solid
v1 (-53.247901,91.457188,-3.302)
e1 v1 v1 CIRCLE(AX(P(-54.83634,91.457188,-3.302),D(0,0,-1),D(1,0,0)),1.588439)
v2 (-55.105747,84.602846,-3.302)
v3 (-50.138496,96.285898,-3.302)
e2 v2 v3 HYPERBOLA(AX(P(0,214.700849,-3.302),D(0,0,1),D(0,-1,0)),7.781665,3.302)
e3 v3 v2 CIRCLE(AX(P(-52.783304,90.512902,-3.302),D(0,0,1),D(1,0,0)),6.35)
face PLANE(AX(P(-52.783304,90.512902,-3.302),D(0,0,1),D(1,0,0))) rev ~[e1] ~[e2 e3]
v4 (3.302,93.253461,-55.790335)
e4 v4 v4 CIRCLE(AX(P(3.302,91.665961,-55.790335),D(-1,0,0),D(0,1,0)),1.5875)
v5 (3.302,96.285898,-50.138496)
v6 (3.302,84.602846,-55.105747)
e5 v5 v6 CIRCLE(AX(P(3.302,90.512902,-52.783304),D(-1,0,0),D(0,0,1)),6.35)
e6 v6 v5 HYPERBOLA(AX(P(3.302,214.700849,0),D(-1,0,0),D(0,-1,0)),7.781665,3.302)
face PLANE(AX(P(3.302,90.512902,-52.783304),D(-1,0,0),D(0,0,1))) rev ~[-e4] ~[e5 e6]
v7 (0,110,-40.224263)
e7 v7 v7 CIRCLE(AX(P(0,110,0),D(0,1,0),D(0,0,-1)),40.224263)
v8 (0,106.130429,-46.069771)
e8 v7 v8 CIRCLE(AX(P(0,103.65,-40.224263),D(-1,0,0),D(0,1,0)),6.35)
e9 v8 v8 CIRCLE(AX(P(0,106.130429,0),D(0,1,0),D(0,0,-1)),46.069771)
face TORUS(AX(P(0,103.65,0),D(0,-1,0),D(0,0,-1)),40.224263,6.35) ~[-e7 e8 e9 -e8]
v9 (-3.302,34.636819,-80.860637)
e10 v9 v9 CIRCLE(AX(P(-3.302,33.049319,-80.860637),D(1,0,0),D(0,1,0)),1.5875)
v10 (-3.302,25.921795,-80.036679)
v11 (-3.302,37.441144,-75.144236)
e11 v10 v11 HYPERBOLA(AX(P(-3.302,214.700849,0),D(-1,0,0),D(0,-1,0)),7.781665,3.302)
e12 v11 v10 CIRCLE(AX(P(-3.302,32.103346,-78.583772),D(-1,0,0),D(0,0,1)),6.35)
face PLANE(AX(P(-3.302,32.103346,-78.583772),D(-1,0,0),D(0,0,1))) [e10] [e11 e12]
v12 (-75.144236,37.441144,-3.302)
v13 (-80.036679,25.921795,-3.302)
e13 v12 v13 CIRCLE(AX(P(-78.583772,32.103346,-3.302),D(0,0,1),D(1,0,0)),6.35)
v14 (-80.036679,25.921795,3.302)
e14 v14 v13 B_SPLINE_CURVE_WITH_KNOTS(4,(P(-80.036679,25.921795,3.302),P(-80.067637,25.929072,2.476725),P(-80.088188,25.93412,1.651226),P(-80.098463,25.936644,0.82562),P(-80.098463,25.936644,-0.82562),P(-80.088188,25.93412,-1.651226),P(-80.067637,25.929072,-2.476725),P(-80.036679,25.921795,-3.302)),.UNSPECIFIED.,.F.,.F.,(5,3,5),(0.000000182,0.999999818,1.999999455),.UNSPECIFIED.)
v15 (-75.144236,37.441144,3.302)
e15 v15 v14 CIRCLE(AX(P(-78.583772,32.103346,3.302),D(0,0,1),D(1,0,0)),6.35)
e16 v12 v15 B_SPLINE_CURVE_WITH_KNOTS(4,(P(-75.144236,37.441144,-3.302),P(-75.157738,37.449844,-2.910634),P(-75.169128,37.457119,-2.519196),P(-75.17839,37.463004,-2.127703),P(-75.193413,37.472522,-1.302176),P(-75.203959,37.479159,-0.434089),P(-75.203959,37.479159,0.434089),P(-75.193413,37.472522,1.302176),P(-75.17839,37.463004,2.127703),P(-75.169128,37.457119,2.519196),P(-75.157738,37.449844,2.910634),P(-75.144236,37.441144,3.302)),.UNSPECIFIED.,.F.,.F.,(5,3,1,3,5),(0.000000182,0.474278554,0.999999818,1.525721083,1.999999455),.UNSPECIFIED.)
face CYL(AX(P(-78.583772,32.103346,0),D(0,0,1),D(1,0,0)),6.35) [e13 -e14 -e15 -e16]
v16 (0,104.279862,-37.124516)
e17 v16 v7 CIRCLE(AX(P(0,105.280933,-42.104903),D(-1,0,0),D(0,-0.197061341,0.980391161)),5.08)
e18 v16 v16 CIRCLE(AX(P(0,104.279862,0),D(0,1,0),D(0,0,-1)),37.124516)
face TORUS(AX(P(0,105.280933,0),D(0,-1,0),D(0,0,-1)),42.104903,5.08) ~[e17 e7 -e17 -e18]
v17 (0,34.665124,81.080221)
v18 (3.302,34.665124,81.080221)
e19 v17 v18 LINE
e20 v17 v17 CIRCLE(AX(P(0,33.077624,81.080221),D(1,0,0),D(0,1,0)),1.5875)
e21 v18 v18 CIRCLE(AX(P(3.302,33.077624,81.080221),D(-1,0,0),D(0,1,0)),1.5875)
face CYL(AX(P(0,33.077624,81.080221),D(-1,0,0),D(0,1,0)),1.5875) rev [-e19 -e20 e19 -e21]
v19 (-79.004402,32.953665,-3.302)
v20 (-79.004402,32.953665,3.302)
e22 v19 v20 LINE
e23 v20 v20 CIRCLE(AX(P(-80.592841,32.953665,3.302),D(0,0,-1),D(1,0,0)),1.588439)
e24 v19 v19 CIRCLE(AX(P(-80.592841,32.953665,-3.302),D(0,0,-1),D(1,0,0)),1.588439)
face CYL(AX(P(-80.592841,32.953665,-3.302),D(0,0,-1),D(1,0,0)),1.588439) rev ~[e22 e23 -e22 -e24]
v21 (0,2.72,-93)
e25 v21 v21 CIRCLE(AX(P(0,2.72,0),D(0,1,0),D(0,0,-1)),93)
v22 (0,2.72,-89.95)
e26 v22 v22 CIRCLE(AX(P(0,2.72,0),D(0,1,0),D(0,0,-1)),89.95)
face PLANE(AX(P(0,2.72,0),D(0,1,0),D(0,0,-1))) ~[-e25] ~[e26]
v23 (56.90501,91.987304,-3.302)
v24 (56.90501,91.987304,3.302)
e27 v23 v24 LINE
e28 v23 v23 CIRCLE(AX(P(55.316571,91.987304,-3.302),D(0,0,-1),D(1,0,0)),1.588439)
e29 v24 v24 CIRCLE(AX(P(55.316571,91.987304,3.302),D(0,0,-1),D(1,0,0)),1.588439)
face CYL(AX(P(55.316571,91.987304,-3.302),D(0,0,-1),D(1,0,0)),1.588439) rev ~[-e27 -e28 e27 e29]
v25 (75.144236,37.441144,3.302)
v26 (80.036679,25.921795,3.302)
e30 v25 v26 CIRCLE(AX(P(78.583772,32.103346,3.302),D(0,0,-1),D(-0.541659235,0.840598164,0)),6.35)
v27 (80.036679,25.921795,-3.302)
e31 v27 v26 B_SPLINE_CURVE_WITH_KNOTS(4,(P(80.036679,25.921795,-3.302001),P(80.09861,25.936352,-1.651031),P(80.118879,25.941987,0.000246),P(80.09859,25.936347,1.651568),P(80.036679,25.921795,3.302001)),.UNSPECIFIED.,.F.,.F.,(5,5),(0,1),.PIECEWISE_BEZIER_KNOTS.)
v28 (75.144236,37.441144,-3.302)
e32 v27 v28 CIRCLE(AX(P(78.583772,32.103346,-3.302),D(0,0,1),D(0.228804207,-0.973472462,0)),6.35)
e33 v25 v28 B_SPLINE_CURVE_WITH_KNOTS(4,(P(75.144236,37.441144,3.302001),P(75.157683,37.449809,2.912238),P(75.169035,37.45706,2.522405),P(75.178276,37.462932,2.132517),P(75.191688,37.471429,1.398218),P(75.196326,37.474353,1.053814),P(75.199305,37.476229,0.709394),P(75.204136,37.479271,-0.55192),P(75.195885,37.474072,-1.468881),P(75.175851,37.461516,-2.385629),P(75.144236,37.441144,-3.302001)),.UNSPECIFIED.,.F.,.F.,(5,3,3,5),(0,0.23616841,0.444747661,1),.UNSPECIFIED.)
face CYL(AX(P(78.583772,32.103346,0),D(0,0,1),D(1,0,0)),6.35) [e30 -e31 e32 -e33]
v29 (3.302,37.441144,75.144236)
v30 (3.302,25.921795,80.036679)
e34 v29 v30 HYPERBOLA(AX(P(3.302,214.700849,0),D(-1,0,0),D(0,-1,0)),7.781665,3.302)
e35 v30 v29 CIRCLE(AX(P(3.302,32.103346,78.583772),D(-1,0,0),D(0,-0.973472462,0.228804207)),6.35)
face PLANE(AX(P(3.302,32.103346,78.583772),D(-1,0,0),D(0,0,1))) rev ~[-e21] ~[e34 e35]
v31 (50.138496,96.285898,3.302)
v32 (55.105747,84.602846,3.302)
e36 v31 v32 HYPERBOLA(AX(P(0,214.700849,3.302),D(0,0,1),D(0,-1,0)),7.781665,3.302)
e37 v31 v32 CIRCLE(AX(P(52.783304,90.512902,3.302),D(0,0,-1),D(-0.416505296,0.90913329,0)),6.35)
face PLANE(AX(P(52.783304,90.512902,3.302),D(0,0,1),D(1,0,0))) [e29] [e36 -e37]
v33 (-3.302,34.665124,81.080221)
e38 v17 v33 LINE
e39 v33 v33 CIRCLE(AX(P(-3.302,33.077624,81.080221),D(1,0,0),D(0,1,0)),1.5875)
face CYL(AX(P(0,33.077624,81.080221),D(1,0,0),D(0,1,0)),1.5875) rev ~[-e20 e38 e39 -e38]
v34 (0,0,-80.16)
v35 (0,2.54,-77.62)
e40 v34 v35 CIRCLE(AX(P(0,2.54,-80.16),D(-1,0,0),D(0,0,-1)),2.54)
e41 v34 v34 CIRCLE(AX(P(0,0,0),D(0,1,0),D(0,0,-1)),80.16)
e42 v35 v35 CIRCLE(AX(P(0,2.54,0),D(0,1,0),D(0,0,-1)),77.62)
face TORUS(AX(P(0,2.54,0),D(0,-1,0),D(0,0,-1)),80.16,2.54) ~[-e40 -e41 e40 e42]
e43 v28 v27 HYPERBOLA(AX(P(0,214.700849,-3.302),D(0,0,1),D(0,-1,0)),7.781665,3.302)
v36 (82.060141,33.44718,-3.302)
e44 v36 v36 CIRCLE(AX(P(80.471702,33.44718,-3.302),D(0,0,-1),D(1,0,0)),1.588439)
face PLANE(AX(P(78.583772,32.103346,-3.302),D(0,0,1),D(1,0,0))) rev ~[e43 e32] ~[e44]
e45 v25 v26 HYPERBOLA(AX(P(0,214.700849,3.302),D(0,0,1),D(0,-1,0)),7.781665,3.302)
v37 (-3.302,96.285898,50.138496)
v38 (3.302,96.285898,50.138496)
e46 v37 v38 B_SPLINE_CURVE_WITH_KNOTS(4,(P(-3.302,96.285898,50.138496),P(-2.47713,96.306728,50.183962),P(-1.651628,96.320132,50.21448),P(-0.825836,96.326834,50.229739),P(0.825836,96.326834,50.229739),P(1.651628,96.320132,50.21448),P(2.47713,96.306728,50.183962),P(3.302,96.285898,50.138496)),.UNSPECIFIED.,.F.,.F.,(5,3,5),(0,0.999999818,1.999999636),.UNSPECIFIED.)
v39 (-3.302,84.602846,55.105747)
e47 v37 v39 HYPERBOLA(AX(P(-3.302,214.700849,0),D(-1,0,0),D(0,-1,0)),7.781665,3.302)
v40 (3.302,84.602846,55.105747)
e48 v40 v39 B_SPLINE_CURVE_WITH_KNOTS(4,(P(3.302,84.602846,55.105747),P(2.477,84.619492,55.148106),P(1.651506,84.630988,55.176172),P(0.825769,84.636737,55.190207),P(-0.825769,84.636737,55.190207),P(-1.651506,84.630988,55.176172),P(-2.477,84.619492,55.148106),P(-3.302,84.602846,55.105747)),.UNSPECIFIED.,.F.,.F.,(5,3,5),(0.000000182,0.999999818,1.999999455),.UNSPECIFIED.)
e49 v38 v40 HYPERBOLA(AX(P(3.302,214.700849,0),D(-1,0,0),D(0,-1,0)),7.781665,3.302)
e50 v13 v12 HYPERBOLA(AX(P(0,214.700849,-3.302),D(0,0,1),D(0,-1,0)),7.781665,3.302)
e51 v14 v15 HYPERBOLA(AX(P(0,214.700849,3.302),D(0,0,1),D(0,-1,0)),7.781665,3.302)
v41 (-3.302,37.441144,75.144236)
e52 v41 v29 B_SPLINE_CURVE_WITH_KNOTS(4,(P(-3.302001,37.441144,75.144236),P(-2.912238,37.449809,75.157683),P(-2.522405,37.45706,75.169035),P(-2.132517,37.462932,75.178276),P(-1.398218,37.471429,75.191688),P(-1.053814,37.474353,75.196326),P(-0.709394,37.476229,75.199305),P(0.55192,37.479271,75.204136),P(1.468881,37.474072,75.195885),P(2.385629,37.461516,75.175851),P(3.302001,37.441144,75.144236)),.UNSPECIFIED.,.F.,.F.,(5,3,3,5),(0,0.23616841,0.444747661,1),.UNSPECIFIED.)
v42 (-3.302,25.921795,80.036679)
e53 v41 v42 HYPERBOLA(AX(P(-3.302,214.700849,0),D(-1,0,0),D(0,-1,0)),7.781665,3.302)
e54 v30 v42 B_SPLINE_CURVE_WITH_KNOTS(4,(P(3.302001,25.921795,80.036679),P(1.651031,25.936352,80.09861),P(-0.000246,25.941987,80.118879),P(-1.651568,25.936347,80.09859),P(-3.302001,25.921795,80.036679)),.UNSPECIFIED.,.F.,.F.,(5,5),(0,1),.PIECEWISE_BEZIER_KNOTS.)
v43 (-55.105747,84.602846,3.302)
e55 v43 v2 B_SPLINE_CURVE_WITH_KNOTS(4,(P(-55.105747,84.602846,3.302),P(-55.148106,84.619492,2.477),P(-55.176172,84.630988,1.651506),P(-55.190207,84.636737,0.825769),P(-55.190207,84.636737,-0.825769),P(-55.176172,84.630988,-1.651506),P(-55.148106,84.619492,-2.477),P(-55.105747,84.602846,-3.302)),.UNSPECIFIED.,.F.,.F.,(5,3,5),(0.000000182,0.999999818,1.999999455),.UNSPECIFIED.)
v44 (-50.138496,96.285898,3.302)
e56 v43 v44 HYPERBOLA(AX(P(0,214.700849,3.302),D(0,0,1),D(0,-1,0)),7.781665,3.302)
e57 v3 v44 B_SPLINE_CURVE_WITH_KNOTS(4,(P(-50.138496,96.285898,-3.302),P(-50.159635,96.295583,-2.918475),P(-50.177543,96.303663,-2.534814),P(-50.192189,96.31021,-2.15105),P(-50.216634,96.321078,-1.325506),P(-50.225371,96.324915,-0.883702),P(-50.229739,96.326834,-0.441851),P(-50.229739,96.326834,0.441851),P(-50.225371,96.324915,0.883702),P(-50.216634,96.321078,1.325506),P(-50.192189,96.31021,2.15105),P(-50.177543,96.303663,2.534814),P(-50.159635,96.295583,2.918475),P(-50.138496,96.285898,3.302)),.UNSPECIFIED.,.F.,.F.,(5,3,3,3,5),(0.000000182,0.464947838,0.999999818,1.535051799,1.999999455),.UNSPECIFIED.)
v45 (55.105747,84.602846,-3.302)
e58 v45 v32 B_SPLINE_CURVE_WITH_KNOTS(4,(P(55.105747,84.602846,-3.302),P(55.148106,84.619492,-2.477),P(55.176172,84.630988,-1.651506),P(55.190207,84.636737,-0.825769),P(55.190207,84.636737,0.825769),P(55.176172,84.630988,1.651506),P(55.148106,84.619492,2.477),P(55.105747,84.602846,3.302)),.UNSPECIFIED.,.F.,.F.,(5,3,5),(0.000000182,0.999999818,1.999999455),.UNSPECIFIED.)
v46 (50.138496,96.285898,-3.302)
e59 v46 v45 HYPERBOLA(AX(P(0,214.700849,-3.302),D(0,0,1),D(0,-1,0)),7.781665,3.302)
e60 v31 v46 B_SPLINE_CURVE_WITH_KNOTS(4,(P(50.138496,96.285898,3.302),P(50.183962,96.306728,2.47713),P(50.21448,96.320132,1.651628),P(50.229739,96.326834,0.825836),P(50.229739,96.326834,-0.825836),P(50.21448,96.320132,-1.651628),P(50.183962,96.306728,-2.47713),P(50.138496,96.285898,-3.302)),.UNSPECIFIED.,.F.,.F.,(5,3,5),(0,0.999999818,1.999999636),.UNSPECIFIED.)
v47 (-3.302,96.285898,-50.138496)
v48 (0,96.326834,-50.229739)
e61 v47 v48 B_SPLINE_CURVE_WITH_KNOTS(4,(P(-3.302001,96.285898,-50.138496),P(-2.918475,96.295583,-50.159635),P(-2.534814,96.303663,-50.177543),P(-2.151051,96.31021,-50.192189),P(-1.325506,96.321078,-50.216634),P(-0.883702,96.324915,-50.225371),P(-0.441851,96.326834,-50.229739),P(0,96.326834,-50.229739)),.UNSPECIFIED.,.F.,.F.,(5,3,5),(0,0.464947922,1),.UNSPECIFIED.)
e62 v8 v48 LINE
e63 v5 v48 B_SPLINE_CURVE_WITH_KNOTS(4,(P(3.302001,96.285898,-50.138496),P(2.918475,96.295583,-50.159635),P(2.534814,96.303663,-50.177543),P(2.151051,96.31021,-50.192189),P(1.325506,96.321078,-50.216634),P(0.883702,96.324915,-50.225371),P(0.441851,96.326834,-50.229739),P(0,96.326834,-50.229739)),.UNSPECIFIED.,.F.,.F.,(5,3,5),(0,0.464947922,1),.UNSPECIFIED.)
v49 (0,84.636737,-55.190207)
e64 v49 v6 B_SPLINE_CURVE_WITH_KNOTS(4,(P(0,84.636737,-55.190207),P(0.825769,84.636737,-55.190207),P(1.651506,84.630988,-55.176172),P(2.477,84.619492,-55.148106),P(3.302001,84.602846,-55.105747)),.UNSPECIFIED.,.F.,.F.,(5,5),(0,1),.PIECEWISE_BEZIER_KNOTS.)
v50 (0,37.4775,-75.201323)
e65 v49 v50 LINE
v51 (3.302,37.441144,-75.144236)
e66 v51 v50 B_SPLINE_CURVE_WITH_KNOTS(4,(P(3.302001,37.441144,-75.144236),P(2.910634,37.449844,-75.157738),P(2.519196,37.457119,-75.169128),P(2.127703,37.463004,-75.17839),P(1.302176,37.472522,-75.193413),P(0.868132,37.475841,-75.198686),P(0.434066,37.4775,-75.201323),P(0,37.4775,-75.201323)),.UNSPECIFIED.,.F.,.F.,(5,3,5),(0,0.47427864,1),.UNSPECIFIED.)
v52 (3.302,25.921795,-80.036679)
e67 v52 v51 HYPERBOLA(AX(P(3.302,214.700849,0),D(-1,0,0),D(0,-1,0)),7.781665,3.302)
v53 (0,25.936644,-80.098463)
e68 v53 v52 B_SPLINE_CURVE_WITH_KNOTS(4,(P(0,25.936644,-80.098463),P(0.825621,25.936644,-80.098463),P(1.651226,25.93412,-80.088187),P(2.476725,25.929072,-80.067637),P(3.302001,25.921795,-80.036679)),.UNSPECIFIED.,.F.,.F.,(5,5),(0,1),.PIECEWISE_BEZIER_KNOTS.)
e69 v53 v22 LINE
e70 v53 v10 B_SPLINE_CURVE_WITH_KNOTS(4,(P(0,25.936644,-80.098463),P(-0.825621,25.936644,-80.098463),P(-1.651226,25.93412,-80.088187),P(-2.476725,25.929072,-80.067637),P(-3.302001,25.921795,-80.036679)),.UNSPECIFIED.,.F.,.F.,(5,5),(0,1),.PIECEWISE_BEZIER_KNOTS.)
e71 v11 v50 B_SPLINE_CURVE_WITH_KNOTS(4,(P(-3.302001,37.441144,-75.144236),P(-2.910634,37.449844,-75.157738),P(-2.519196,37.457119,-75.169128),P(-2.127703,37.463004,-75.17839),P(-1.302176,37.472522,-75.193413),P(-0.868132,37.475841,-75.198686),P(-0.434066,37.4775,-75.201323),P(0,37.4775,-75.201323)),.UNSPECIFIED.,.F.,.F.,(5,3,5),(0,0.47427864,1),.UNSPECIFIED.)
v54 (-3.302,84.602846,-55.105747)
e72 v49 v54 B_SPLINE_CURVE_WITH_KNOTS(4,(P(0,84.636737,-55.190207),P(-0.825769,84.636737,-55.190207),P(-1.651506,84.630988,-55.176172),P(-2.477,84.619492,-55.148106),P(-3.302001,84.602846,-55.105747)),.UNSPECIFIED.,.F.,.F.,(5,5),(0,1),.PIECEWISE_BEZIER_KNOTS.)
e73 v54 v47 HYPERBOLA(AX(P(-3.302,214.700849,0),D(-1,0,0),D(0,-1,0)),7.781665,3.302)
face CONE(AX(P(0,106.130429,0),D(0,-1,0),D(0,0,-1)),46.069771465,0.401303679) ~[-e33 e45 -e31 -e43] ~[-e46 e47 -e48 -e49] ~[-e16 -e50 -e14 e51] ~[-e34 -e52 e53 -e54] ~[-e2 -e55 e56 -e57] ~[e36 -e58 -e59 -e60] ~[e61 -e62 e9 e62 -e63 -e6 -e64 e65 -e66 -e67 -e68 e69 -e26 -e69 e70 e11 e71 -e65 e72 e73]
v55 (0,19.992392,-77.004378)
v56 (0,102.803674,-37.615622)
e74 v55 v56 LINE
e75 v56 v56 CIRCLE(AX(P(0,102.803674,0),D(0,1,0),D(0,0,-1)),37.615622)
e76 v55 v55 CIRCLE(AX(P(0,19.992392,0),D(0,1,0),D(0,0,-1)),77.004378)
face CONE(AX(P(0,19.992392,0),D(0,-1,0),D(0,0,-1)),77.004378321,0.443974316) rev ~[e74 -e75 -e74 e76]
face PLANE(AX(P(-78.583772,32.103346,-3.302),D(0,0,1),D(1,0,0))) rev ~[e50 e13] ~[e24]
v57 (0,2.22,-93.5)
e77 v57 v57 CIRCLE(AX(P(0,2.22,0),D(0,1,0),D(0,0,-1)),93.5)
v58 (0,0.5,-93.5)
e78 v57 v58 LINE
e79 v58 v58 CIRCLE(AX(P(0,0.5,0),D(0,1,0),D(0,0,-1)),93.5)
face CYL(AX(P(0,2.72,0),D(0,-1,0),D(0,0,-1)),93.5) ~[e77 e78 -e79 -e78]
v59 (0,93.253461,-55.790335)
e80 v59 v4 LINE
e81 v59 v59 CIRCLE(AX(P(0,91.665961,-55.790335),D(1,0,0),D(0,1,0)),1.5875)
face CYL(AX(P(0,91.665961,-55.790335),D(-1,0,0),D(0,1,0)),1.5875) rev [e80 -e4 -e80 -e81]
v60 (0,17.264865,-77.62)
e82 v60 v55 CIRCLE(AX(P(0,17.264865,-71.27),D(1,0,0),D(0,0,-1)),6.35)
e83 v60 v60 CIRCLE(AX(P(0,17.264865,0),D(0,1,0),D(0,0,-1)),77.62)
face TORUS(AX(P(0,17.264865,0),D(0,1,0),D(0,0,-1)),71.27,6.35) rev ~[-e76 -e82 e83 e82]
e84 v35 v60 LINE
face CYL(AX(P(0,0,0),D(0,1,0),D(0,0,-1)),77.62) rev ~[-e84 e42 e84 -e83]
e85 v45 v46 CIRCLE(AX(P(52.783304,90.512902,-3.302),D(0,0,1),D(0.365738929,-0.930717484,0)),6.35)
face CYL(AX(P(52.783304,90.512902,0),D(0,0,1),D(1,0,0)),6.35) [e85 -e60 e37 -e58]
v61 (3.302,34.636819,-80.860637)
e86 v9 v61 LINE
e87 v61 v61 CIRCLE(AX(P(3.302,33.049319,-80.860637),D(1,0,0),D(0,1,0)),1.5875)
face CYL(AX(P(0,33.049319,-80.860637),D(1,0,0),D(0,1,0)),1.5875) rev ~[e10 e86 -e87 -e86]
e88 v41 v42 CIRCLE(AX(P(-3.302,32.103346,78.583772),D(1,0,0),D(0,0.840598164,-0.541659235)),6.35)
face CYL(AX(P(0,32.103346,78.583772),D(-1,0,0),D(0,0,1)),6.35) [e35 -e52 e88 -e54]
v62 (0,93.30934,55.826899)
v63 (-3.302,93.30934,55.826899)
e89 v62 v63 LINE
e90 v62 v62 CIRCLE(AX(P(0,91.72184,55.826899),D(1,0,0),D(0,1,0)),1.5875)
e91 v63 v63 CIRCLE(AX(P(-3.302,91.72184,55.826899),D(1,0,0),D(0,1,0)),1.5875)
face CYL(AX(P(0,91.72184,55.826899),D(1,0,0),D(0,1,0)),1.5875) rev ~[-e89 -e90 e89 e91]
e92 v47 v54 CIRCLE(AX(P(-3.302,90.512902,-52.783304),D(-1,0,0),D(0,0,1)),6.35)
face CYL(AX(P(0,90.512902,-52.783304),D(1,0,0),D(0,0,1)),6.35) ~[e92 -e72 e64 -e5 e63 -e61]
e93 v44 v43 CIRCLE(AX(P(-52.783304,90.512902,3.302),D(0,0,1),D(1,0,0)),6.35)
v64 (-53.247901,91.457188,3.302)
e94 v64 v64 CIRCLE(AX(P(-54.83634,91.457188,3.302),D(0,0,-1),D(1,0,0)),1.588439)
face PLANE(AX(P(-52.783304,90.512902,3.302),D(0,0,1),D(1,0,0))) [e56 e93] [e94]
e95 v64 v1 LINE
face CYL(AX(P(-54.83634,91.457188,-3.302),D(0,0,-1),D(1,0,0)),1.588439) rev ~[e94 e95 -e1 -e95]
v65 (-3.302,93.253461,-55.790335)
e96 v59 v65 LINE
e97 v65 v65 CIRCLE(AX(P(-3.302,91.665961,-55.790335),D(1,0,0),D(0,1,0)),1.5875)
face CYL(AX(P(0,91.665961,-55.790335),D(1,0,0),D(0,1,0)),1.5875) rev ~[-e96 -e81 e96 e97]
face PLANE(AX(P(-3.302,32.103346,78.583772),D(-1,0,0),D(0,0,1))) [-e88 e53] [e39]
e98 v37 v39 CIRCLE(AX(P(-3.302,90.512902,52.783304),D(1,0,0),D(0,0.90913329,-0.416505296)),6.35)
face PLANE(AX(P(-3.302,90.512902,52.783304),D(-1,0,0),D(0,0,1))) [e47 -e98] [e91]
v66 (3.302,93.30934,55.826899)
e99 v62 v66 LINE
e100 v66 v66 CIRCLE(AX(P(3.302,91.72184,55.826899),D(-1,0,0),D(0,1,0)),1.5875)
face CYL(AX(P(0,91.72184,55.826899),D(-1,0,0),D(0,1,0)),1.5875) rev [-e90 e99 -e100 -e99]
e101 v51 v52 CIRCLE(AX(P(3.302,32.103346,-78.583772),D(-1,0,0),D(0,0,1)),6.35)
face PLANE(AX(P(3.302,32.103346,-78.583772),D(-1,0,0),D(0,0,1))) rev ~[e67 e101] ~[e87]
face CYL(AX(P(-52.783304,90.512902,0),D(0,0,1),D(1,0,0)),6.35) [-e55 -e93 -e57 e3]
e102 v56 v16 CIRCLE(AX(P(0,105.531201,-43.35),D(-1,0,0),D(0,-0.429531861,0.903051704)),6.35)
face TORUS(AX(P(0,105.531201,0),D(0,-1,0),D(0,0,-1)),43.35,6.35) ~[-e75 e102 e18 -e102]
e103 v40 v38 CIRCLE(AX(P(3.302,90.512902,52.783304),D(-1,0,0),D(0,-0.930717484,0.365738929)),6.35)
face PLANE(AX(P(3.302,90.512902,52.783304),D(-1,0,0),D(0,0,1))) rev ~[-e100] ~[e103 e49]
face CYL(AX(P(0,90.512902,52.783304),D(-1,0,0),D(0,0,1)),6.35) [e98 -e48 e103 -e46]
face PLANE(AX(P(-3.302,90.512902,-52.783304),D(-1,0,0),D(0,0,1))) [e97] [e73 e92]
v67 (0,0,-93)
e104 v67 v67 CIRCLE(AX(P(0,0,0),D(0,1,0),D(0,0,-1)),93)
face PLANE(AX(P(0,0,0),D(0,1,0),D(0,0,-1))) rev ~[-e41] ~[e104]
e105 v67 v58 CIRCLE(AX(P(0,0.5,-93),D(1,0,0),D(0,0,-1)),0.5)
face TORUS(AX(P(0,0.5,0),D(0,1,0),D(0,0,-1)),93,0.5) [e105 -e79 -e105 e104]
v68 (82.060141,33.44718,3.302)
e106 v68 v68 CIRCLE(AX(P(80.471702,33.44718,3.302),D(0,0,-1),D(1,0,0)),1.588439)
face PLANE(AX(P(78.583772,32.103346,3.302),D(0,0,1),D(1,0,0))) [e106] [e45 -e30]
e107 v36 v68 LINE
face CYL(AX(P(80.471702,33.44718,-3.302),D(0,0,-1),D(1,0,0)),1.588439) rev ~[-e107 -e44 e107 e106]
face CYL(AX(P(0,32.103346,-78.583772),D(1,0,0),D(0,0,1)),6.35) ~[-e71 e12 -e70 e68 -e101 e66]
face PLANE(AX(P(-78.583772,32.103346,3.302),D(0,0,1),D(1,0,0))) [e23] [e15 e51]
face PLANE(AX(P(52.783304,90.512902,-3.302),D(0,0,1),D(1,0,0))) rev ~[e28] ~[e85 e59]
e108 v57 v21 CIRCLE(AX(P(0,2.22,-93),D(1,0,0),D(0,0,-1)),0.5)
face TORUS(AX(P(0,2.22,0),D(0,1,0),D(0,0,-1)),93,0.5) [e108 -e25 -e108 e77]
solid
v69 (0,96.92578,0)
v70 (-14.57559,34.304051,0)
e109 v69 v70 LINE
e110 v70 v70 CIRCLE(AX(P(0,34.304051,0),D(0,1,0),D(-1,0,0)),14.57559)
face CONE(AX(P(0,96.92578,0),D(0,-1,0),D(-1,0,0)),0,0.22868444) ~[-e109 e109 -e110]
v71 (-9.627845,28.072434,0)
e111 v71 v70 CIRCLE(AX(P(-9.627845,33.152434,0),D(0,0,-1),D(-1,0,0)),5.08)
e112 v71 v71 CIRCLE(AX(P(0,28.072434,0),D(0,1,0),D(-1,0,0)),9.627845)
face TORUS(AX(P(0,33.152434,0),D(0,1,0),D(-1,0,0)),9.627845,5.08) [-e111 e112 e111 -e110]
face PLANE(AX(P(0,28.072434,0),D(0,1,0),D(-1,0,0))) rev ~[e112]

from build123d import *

# Parameters (mm, degrees)
F4_R      = 2.54
F5_R      = 0.5
F6_R      = 6.35
F7_DEPTH  = 3.302
F8_ANGLE  = -90
F9_DEPTH  = 3.302
F10_R     = 1.5884390158
F11_DEPTH = 12.7
F12_R     = 1.5875
F13_DEPTH = 12.7
F16_R     = 5.08


# Not quite as in the source:
# - a fillet or chamfer that OpenCascade refuses, or shapes differently, is made with other operations: its cross-section is extruded or revolved along the edge and cut away or added


with BuildPart() as f2:
    # F1 (on Top) → F2 (revolve)
    with BuildSketch(Plane.XY):
        with BuildLine():
            Line((-93.5, 0), (-77.62, 0))
            Line((-77.62, 0), (-77.62, 17.2648650431))
            ThreePointArc((-77.62, 17.2648650431), (-77.4641828492, 18.6629347231), (-77.0043783212, 19.9923923608))
            Line((-77.0043783212, 19.9923923608), (-37.6156216788, 102.8036737445))
            ThreePointArc((-37.6156216788, 102.8036737445), (-37.1558171508, 104.1331313823), (-37, 105.5312010623))
            Line((-37, 105.5312010623), (-37, 110))
            Line((-37, 110), (-40.2242628687, 110))
            ThreePointArc((-40.2242628687, 110), (-43.7293858539, 108.9449610818), (-46.0697714652, 106.1304292467))
            Line((-46.0697714652, 106.1304292467), (-89.95, 2.72))
            Line((-89.95, 2.72), (-93.5, 2.72))
            Line((-93.5, 2.72), (-93.5, 0))
        make_face()
    revolve(axis=Axis((0, 28.3275991678, 0), (0, 1, 0)))

    # F3: fillet of radius 5.08 on 1 edges, made by hand

    # F3_s1 → F3_t2 (revolve, cut)
    with BuildSketch(Plane.XY):
        with BuildLine():
            ThreePointArc((-37.1245161297, 104.2798615477), (-37.6385377676, 107.7012594993), (-40.2242628687, 110))
            Line((-40.2242628687, 110), (-40.0361988329, 110.4719066841))
            ThreePointArc((-40.0361988329, 110.4719066841), (-38.6121314343, 110.508), (-37, 110.508))
            Line((-37, 110.508), (-36.492, 110))
            ThreePointArc((-36.492, 110), (-36.492, 105.5312010623), (-36.6264774201, 104.1797543865))
            Line((-36.6264774201, 104.1797543865), (-37.1245161297, 104.2798615477))
        make_face()
    revolve(axis=Axis((0, 110, 0), (0, 1, 0)), mode=Mode.SUBTRACT)

    # F4
    f4_edges = [f2.edges().sort_by_distance(p)[0] for p in [
        (77.62, 0, 0),
    ]]
    fillet(f4_edges, radius=F4_R)

    # F5
    f5_edges = [f2.edges().sort_by_distance(p)[0] for p in [
        (93.5, 2.72, 0),
        (93.5, 0, 0),
    ]]
    fillet(f5_edges, radius=F5_R)

    # F6 (on Top) → F7 (join, symmetric)
    with BuildSketch(Plane.XY):
        with Locations((-78.5837723943, 32.1033455817)):
            Circle(F6_R)
        with Locations((-52.7833043417, 90.5129020759)):
            Circle(F6_R)
        with Locations((52.7833043417, 90.5129020759)):
            Circle(F6_R)
        with Locations((78.5837723943, 32.1033455817)):
            Circle(F6_R)
    extrude(amount=F7_DEPTH, both=True)


with BuildPart() as f2_1:
    # F8: moved
    add(f2.part.rotate(Axis((0, 28.3275991678, 0), (0, 1, 0)), F8_ANGLE))

    # F6 (on Top) → F9 (join, symmetric)
    with BuildSketch(Plane.XY):
        with Locations((-78.5837723943, 32.1033455817)):
            Circle(F6_R)
        with Locations((-52.7833043417, 90.5129020759)):
            Circle(F6_R)
        with Locations((52.7833043417, 90.5129020759)):
            Circle(F6_R)
        with Locations((78.5837723943, 32.1033455817)):
            Circle(F6_R)
    extrude(amount=F9_DEPTH, both=True)

    # F10 (on face) → F11 (cut, symmetric)
    with BuildSketch(Plane(origin=(0, 0, -3.302), x_dir=(1, 0, 0), z_dir=(0, 0, -1))):
        with Locations((55.3165711462, -91.9873043895)):
            Circle(F10_R)
        with Locations((80.47170192, -33.4471799433)):
            Circle(F10_R)
        with Locations((-80.59284091, -32.9536646605)):
            Circle(F10_R)
        with Locations((-54.8363402486, -91.4571881294)):
            Circle(F10_R)
    extrude(amount=F11_DEPTH, both=True, mode=Mode.SUBTRACT)

    # F12 (on Right) → F13 (cut, symmetric)
    with BuildSketch(Plane.YZ):
        with Locations((33.0776236951, 81.0802206397)):
            Circle(F12_R)
        with Locations((91.7218402028, 55.8268986642)):
            Circle(F12_R)
        with Locations((91.6659608483, -55.79033494)):
            Circle(F12_R)
        with Locations((33.0493189394, -80.8606371284)):
            Circle(F12_R)
    extrude(amount=F13_DEPTH, both=True, mode=Mode.SUBTRACT)


with BuildPart() as f15:
    # F14 (on Top) → F15 (revolve)
    with BuildSketch(Plane.XY):
        Polygon((-16.0260368139, 28.0724335462), (0, 28.0724335462), (0, 96.9257801771), align=None)
    revolve(axis=Axis((0, 28.3275991678, 0), (0, 1, 0)))

    # F16
    f16_edges = [f15.edges().sort_by_distance(p)[0] for p in [
        (16.026037, 28.072434, 0),
        (-8.013018, 62.499107, 0),
    ]]
    fillet(f16_edges, radius=F16_R)


solid = Compound([f2_1.part, f15.part])
